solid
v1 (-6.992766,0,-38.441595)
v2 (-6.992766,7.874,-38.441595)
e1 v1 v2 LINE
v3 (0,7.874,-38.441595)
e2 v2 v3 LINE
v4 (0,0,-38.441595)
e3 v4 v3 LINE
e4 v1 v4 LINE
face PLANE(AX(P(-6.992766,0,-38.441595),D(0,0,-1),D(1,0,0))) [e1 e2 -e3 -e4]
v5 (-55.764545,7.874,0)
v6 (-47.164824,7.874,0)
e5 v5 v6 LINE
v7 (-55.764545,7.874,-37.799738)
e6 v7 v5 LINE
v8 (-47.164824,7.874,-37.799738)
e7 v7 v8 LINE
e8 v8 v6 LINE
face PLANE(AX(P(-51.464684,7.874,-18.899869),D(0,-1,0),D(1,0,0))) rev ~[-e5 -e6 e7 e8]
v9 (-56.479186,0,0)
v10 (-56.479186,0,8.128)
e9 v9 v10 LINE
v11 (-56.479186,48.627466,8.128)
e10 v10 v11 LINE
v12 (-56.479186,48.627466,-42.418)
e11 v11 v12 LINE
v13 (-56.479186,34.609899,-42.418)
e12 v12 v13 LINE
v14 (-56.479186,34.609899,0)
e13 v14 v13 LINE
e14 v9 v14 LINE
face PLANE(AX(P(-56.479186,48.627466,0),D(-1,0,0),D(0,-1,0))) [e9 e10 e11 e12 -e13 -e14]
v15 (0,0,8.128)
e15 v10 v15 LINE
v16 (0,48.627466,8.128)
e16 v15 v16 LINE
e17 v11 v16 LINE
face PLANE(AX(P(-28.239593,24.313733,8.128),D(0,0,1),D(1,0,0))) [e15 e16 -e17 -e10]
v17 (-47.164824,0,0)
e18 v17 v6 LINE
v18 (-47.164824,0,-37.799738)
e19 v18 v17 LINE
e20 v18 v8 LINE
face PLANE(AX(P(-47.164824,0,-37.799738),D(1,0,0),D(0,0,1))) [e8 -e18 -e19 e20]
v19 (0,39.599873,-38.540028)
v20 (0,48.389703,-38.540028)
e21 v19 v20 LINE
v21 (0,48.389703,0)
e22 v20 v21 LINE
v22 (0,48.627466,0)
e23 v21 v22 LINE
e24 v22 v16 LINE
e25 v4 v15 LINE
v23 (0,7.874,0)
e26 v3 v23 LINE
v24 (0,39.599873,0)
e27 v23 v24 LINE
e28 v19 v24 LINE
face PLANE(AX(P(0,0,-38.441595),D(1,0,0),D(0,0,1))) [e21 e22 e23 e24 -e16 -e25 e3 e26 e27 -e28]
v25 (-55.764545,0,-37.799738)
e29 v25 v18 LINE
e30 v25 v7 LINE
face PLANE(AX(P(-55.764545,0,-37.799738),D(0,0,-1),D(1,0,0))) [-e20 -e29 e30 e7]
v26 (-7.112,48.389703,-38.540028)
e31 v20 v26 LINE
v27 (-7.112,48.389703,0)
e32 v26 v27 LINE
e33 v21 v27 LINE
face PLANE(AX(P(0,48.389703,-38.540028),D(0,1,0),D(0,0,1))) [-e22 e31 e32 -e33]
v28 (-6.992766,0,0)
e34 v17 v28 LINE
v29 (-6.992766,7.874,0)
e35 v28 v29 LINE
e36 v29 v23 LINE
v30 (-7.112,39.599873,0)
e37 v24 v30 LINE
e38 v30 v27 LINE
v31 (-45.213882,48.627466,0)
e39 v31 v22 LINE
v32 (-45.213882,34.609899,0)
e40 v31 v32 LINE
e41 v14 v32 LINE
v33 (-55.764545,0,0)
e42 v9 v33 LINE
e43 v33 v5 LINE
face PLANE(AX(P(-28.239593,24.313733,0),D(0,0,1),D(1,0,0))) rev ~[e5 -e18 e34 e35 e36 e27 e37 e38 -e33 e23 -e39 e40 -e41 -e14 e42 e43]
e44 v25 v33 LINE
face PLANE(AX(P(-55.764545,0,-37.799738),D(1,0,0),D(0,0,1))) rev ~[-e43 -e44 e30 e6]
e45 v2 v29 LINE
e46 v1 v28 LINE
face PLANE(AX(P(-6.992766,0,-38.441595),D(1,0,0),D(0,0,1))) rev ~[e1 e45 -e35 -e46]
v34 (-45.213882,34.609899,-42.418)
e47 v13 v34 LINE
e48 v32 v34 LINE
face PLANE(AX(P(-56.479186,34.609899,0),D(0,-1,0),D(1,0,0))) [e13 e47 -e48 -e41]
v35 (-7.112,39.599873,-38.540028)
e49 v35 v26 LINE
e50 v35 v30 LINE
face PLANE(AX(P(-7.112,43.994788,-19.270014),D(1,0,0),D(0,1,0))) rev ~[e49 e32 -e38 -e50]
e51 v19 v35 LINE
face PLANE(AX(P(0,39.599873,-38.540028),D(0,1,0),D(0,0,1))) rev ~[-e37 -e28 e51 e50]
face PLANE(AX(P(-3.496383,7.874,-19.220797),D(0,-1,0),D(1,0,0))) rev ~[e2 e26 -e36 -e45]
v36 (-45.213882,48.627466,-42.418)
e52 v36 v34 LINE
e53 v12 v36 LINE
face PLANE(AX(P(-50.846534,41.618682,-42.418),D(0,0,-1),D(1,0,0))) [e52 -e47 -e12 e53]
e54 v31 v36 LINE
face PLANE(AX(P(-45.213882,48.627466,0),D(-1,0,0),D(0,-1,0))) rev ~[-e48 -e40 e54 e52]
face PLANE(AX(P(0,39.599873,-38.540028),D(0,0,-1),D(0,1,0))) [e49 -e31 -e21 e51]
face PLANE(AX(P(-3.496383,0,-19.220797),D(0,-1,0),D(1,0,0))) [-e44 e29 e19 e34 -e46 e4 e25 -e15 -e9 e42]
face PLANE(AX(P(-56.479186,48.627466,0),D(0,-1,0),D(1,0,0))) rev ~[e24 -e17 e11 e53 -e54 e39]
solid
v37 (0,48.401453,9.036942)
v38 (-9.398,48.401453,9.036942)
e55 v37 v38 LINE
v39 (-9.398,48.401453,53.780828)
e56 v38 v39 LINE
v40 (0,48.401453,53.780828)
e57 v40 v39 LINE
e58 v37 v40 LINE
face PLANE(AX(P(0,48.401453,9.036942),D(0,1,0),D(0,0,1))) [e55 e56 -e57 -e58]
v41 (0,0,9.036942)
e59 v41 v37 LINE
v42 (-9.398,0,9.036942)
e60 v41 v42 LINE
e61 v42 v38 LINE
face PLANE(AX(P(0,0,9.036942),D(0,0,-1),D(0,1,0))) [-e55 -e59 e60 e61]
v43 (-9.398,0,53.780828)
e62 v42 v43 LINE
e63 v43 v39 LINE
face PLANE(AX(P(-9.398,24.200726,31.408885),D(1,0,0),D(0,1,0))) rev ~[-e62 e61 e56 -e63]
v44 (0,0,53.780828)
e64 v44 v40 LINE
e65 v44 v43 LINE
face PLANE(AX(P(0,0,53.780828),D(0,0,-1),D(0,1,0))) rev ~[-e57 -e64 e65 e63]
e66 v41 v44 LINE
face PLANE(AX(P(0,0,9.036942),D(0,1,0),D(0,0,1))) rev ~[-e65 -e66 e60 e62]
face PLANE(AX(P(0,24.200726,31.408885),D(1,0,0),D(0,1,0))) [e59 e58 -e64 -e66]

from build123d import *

# Parameters (mm, degrees)
F0_W      = 56.4791858196
F0_H      = 48.6274659634
F1_DEPTH  = 8.128
F2_W      = 8.5997208953
F2_H      = 37.7997383475
F2_W_2    = 6.992766168
F2_H_2    = 38.4415946901
F3_DEPTH  = 7.874
F4_W      = 8.7898299098
F4_H      = 38.5400280356
F5_DEPTH  = 7.112
F6_W      = 11.2653039396
F6_H      = 14.0175670385
F7_DEPTH  = 42.418
F8_W      = 48.401452601
F8_H      = 44.7438852862
F10_DEPTH = 9.398


# Not quite as in the source:
# - a feature of the source that left no trace in its solid (it failed there, or was rolled back) is left out


with BuildPart() as f1:
    # F0 (on Top) → F1 (new body)
    with BuildSketch(Plane.XY):
        with Locations((-28.2395929098, 24.3137329817)):
            Rectangle(F0_W, F0_H)
    extrude(amount=F1_DEPTH)

    # F2 (on Front) → F3 (join)
    with BuildSketch(Plane.XZ):
        with Locations((-51.4646843076, -18.8998691738)):
            Rectangle(F2_W, F2_H)
        with Locations((-3.496383084, -19.220797345)):
            Rectangle(F2_W_2, F2_H_2)
    extrude(amount=-F3_DEPTH)

    # F4 (on Right) → F5 (join)
    with BuildSketch(Plane.YZ):
        with Locations((43.9947880805, -19.2700140178)):
            Rectangle(F4_W, F4_H)
    extrude(amount=-F5_DEPTH)

    # F6 (on face) → F7 (join)
    with BuildSketch(Plane(origin=(0, 0, 0), x_dir=(1, 0, 0), z_dir=(0, 0, -1))):
        with Locations((-50.8465338498, -41.6186824441)):
            Rectangle(F6_W, F6_H)
    extrude(amount=F7_DEPTH)


with BuildPart() as f10:
    # F8 (on Right) → F10 (new body)
    with BuildSketch(Plane.YZ):
        with Locations((24.2007263005, 31.4088850282)):
            Rectangle(F8_W, F8_H)
    extrude(amount=-F10_DEPTH)


solid = Compound([f1.part, f10.part])
